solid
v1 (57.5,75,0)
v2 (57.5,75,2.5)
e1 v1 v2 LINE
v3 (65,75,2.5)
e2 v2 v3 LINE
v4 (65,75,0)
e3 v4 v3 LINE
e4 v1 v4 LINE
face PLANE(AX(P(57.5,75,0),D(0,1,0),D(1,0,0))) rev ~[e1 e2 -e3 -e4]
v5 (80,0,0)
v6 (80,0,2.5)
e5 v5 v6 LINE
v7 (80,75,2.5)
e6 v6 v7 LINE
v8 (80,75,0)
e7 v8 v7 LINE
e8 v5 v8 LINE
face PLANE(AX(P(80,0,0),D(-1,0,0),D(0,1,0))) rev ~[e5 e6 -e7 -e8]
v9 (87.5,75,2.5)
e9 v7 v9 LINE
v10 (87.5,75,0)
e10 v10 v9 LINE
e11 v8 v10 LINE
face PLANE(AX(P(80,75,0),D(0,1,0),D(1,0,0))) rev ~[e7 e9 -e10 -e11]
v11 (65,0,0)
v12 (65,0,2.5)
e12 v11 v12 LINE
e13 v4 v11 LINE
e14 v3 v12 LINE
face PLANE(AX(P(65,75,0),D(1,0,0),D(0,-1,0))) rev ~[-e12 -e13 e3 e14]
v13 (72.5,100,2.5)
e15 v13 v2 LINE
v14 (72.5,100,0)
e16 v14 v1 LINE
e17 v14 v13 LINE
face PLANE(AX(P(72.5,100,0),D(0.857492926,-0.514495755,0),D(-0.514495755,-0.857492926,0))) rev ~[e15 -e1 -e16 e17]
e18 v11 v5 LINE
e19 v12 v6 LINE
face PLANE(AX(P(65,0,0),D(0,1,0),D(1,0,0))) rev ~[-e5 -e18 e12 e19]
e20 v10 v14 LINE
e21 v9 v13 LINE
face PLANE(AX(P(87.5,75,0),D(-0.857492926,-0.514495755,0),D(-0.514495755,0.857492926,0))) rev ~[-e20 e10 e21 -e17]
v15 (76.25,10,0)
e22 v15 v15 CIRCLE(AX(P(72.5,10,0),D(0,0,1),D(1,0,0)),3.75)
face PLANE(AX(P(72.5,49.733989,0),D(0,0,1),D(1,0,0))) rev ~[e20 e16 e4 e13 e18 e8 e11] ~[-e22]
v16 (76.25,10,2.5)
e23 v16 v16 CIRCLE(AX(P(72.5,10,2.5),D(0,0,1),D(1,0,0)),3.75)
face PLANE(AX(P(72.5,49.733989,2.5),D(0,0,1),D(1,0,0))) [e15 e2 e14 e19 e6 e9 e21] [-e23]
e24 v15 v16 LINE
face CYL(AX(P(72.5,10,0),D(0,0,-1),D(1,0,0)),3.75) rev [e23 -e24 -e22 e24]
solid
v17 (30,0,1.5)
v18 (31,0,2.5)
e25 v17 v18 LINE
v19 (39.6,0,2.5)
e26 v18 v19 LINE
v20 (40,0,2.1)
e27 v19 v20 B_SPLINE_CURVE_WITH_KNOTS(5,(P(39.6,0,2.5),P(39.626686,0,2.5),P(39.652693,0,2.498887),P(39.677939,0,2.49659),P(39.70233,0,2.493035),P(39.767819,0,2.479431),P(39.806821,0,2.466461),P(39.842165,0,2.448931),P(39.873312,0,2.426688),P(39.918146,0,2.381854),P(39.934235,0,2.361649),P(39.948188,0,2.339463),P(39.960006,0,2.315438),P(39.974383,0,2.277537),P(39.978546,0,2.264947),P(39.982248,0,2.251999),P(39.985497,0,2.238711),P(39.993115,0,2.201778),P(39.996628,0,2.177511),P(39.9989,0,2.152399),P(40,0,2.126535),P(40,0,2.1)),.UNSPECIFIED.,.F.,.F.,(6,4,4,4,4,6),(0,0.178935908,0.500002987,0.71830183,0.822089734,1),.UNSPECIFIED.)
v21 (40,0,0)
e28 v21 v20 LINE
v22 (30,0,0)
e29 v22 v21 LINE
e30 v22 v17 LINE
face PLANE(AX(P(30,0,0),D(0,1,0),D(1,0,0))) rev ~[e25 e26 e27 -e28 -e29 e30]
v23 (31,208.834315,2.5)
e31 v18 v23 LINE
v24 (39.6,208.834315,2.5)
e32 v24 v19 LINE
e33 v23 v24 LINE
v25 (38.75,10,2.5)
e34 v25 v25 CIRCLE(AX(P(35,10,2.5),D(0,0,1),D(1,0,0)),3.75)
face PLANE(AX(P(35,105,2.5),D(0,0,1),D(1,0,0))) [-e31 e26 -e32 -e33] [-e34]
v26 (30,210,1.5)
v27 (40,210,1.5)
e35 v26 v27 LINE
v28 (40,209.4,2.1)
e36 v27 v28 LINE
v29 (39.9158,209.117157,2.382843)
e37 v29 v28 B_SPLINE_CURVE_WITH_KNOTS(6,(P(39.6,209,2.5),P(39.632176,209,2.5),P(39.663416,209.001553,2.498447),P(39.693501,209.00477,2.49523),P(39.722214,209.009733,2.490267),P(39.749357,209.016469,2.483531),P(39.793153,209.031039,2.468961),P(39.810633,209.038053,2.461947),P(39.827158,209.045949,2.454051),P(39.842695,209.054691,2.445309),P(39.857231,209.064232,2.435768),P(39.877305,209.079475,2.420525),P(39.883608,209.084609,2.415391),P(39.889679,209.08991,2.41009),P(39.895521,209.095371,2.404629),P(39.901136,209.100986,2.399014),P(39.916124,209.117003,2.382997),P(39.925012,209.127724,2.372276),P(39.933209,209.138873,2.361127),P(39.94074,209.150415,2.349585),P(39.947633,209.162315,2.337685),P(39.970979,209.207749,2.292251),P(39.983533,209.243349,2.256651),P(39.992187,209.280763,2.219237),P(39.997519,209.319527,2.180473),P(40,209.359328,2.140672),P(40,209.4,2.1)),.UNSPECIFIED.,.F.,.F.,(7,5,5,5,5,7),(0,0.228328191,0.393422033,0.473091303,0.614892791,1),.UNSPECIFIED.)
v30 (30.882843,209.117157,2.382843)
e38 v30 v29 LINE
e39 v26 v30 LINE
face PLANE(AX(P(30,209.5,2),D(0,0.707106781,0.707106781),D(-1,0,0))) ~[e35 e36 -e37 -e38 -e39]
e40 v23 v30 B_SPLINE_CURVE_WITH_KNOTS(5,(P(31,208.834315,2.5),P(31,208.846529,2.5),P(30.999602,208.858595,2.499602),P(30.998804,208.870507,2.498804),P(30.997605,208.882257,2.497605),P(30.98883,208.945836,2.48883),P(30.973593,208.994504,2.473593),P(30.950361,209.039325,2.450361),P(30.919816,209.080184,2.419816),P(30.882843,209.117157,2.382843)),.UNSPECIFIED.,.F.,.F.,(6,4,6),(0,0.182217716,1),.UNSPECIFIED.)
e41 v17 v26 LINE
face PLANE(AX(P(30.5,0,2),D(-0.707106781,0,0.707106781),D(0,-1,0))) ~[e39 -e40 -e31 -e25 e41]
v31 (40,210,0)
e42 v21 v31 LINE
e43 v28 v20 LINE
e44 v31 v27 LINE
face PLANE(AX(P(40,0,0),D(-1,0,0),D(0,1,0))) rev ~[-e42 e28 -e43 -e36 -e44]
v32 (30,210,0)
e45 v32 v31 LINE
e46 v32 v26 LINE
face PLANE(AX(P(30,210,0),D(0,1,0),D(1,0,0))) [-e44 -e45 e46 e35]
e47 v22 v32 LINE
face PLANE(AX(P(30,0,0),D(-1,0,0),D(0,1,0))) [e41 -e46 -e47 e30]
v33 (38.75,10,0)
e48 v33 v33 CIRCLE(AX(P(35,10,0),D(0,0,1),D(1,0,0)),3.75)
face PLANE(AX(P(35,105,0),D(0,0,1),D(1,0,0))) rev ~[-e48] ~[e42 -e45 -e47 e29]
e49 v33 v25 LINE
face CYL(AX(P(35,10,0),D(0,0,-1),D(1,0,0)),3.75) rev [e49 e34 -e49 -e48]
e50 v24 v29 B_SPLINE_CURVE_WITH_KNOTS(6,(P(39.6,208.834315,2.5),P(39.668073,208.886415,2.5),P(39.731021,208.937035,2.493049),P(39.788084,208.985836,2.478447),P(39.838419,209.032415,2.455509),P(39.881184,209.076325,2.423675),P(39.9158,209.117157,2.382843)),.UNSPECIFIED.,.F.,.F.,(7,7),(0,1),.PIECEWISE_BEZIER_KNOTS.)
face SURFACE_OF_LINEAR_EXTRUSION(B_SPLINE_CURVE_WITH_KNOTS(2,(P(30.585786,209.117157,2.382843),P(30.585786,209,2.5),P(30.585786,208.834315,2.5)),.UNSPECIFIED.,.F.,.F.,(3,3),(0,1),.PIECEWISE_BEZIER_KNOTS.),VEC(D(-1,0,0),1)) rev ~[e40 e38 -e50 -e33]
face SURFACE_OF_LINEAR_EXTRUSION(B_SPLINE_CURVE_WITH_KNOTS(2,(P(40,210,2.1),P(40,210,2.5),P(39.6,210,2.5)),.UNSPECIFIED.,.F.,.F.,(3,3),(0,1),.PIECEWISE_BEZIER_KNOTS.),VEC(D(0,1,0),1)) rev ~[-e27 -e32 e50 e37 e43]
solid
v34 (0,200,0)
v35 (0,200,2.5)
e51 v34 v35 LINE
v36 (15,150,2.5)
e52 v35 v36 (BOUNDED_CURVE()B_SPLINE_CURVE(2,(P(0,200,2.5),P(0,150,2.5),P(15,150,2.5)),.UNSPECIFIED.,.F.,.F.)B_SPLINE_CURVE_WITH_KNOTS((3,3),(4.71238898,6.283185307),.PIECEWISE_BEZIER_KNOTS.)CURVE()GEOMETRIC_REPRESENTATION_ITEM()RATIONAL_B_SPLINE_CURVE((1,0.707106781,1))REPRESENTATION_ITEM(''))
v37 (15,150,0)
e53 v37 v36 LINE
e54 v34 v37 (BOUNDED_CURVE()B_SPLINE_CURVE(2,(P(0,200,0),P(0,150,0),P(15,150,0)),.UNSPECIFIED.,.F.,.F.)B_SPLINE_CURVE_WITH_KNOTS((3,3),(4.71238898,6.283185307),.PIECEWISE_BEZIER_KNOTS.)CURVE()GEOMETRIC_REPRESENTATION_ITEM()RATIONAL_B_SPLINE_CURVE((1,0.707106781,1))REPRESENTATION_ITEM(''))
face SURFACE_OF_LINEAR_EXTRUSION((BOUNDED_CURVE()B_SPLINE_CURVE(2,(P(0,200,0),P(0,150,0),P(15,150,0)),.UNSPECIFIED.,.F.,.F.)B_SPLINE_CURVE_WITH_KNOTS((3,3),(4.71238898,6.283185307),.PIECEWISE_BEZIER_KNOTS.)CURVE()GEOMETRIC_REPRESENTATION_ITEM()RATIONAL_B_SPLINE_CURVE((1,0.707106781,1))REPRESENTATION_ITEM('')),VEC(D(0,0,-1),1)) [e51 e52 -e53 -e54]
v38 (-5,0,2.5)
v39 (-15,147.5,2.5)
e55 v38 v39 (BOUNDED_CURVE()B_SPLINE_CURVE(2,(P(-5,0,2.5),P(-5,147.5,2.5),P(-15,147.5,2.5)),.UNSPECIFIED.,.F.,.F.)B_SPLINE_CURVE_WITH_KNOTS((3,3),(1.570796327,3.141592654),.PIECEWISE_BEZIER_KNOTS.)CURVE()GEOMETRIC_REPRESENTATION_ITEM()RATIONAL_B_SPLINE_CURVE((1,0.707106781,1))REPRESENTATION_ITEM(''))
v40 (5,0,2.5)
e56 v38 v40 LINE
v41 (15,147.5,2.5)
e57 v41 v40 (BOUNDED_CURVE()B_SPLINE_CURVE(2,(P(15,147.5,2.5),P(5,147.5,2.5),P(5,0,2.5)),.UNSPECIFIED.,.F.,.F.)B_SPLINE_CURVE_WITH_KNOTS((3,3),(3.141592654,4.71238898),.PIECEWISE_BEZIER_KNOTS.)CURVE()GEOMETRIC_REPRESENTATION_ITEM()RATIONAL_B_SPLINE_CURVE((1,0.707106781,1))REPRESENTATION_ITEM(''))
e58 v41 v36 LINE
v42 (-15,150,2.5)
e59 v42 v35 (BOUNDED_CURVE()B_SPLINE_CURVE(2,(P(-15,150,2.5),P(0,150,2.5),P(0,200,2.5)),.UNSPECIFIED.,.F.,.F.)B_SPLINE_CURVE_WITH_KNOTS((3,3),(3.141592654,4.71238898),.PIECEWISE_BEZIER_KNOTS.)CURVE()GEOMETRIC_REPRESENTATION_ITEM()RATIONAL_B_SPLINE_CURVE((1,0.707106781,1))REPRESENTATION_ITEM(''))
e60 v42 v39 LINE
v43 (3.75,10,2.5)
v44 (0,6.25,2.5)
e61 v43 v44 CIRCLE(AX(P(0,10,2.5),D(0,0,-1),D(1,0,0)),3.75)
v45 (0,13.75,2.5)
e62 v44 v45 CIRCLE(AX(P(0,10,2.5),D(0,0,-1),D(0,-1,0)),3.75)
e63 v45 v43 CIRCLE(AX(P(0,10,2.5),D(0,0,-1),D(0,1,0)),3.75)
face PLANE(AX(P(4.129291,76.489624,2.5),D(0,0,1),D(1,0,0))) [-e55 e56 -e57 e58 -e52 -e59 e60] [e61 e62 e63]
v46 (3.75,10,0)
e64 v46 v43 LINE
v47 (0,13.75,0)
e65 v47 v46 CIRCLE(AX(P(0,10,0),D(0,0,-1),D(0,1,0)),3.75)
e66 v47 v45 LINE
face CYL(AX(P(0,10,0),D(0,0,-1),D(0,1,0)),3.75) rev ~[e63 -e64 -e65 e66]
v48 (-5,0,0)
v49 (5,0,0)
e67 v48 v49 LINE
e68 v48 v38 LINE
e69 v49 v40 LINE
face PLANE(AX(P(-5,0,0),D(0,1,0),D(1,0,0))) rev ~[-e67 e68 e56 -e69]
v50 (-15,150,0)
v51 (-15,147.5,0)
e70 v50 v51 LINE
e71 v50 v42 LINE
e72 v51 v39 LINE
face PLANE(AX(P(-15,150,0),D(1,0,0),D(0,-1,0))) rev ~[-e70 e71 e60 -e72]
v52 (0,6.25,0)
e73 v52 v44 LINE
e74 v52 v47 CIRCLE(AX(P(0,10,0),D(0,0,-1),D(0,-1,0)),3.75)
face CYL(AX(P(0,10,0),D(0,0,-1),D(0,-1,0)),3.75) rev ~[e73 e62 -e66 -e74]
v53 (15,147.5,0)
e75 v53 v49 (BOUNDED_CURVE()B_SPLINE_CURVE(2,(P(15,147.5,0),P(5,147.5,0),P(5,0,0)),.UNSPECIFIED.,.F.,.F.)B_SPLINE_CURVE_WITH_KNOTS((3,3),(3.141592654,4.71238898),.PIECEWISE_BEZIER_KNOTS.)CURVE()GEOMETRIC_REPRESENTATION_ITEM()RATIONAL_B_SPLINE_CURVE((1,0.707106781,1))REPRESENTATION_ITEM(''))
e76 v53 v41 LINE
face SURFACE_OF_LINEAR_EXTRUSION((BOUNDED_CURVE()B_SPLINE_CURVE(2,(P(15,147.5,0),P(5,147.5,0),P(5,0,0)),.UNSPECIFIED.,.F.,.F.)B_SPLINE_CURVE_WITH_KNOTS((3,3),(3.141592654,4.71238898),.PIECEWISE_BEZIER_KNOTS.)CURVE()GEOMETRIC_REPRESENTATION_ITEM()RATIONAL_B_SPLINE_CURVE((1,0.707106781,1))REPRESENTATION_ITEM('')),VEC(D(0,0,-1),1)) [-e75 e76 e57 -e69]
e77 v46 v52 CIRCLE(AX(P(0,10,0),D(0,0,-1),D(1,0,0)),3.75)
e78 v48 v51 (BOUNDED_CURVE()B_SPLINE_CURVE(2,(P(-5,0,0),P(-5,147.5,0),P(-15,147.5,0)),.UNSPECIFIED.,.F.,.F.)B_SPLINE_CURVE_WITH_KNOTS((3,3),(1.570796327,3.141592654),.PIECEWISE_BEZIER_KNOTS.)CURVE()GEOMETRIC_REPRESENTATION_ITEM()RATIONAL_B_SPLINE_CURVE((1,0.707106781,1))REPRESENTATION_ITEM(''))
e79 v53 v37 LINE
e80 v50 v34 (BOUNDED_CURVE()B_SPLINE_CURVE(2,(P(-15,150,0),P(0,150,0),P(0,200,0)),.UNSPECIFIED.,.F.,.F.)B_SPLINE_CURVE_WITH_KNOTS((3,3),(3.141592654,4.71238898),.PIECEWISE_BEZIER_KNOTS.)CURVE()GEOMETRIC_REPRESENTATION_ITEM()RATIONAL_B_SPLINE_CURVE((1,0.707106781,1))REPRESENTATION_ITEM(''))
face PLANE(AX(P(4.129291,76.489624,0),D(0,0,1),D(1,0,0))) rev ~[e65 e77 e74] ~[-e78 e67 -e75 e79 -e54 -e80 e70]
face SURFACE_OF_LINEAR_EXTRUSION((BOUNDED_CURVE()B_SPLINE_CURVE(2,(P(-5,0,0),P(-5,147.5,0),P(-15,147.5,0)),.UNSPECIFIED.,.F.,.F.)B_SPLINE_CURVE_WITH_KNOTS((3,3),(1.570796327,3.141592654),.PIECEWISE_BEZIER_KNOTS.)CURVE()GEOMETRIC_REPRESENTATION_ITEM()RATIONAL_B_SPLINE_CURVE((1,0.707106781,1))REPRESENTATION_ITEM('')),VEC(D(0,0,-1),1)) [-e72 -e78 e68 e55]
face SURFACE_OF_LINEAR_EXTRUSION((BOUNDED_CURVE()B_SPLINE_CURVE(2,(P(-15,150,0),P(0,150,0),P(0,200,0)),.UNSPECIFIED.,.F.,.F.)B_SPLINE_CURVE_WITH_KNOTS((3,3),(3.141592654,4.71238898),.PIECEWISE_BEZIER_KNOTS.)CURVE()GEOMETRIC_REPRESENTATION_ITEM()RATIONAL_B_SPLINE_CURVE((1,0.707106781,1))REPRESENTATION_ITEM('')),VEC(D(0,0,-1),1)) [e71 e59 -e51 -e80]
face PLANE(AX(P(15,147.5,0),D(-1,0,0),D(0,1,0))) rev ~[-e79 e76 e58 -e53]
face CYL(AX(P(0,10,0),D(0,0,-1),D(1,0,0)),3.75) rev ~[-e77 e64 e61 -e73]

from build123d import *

# Parameters (mm, degrees)
F0_W        = 10
F0_H        = 2.5
F1_DEPTH    = 2.5
F2_W        = 10
F2_H        = 210
F2_R        = 3.75
F3_DEPTH    = 2.5
F4_R        = 3.75
F5_DEPTH    = 2.5
F6_SIZE     = 1
F7_T1_DEPTH = 211
F7_T3_DEPTH = 9.8284271247


# Not quite as in the source:
# - a fillet or chamfer that OpenCascade refuses, or shapes differently, is made with other operations: its cross-section is extruded or revolved along the edge and cut away or added


with BuildPart() as f1:
    # F0 (on Top) → F1 (new body)
    with BuildSketch(Plane.XY):
        with BuildLine():
            Line((0, 6.25), (0, 0))
            Line((0, 0), (5, 0))
            add(Edge.make_bspline(
                [(15, 147.5), (5, 147.5), (5, 0)],
                knots=[3.1415926536, 3.1415926536, 3.1415926536, 4.7123889804, 4.7123889804, 4.7123889804], degree=2, weights=[1, 0.7071067812, 1]))
            Line((15, 147.5), (5, 147.5))
            Line((5, 147.5), (5, 150))
            Line((5, 150), (0, 150))
            Line((0, 150), (0, 13.75))
            ThreePointArc((0, 13.75), (2.6516504294, 12.6516504294), (3.75, 10))
            ThreePointArc((3.75, 10), (2.6516504294, 7.3483495706), (0, 6.25))
        make_face()
        with Locations((10, 148.75)):
            Rectangle(F0_W, F0_H)
        with BuildLine():
            Line((0, 200), (0, 150))
            Line((0, 150), (5, 150))
            Line((5, 150), (15, 150))
            add(Edge.make_bspline(
                [(0, 200), (0, 150), (15, 150)],
                knots=[4.7123889804, 4.7123889804, 4.7123889804, 6.2831853072, 6.2831853072, 6.2831853072], degree=2, weights=[1, 0.7071067812, 1]))
        make_face()
        with BuildLine():
            Line((-5, 0), (0, 0))
            Line((0, 0), (0, 6.25))
            ThreePointArc((0, 6.25), (-3.75, 10), (0, 13.75))
            Line((0, 13.75), (0, 150))
            Line((0, 150), (0, 200))
            add(Edge.make_bspline(
                [(-15, 150), (0, 150), (0, 200)],
                knots=[3.1415926536, 3.1415926536, 3.1415926536, 4.7123889804, 4.7123889804, 4.7123889804], degree=2, weights=[1, 0.7071067812, 1]))
            Line((-15, 150), (-15, 147.5))
            add(Edge.make_bspline(
                [(-5, 0), (-5, 147.5), (-15, 147.5)],
                knots=[1.5707963268, 1.5707963268, 1.5707963268, 3.1415926536, 3.1415926536, 3.1415926536], degree=2, weights=[1, 0.7071067812, 1]))
        make_face()
    extrude(amount=F1_DEPTH)


with BuildPart() as f3:
    # F2 (on Top) → F3 (new body)
    with BuildSketch(Plane.XY):
        with Locations((35, 105)):
            Rectangle(F2_W, F2_H)
        with Locations((35, 10)):
            Circle(F2_R, mode=Mode.SUBTRACT)
    extrude(amount=F3_DEPTH)

    # F6
    f6_edges = [f3.edges().sort_by_distance(p)[0] for p in [
        (35, 210, 2.5),
        (30, 105, 2.5),
    ]]
    chamfer(f6_edges, length=F6_SIZE)

    # F7: fillet of radius 0.4 on 2 edges, made by hand

    # F7_s2 → F7_t1 (cut)
    with BuildSketch(Plane.XZ.offset(-210)):
        with BuildLine():
            add(Edge.make_bspline(
                [(40, 2.1), (40, 2.5), (39.6, 2.5)],
                knots=[0, 0, 0, 1, 1, 1], degree=2, weights=[1, 1, 1]))
            Line((39.6, 2.5), (40, 2.5))
            Line((40, 2.5), (40, 2.1))
        make_face()
    extrude(amount=F7_T1_DEPTH, mode=Mode.SUBTRACT)

    # F7_s4 → F7_t3 (cut)
    with BuildSketch(Plane.YZ.offset(30.5857864376)):
        with BuildLine():
            add(Edge.make_bspline(
                [(209.1171572875, 2.3828427125), (209, 2.5), (208.8343145751, 2.5)],
                knots=[0, 0, 0, 1, 1, 1], degree=2, weights=[1, 1, 1]))
            Line((208.8343145751, 2.5), (209, 2.5))
            Line((209, 2.5), (209.1171572875, 2.3828427125))
        make_face()
    extrude(amount=F7_T3_DEPTH, mode=Mode.SUBTRACT)


with BuildPart() as f5:
    # F4 (on Top) → F5 (new body)
    with BuildSketch(Plane.XY):
        Polygon((65, 75), (65, 0), (80, 0), (80, 75), (87.5, 75), (72.5, 100), (57.5, 75), align=None)
        with Locations((72.5, 10)):
            Circle(F4_R, mode=Mode.SUBTRACT)
    extrude(amount=F5_DEPTH)


solid = Compound([f1.part, f3.part, f5.part])
